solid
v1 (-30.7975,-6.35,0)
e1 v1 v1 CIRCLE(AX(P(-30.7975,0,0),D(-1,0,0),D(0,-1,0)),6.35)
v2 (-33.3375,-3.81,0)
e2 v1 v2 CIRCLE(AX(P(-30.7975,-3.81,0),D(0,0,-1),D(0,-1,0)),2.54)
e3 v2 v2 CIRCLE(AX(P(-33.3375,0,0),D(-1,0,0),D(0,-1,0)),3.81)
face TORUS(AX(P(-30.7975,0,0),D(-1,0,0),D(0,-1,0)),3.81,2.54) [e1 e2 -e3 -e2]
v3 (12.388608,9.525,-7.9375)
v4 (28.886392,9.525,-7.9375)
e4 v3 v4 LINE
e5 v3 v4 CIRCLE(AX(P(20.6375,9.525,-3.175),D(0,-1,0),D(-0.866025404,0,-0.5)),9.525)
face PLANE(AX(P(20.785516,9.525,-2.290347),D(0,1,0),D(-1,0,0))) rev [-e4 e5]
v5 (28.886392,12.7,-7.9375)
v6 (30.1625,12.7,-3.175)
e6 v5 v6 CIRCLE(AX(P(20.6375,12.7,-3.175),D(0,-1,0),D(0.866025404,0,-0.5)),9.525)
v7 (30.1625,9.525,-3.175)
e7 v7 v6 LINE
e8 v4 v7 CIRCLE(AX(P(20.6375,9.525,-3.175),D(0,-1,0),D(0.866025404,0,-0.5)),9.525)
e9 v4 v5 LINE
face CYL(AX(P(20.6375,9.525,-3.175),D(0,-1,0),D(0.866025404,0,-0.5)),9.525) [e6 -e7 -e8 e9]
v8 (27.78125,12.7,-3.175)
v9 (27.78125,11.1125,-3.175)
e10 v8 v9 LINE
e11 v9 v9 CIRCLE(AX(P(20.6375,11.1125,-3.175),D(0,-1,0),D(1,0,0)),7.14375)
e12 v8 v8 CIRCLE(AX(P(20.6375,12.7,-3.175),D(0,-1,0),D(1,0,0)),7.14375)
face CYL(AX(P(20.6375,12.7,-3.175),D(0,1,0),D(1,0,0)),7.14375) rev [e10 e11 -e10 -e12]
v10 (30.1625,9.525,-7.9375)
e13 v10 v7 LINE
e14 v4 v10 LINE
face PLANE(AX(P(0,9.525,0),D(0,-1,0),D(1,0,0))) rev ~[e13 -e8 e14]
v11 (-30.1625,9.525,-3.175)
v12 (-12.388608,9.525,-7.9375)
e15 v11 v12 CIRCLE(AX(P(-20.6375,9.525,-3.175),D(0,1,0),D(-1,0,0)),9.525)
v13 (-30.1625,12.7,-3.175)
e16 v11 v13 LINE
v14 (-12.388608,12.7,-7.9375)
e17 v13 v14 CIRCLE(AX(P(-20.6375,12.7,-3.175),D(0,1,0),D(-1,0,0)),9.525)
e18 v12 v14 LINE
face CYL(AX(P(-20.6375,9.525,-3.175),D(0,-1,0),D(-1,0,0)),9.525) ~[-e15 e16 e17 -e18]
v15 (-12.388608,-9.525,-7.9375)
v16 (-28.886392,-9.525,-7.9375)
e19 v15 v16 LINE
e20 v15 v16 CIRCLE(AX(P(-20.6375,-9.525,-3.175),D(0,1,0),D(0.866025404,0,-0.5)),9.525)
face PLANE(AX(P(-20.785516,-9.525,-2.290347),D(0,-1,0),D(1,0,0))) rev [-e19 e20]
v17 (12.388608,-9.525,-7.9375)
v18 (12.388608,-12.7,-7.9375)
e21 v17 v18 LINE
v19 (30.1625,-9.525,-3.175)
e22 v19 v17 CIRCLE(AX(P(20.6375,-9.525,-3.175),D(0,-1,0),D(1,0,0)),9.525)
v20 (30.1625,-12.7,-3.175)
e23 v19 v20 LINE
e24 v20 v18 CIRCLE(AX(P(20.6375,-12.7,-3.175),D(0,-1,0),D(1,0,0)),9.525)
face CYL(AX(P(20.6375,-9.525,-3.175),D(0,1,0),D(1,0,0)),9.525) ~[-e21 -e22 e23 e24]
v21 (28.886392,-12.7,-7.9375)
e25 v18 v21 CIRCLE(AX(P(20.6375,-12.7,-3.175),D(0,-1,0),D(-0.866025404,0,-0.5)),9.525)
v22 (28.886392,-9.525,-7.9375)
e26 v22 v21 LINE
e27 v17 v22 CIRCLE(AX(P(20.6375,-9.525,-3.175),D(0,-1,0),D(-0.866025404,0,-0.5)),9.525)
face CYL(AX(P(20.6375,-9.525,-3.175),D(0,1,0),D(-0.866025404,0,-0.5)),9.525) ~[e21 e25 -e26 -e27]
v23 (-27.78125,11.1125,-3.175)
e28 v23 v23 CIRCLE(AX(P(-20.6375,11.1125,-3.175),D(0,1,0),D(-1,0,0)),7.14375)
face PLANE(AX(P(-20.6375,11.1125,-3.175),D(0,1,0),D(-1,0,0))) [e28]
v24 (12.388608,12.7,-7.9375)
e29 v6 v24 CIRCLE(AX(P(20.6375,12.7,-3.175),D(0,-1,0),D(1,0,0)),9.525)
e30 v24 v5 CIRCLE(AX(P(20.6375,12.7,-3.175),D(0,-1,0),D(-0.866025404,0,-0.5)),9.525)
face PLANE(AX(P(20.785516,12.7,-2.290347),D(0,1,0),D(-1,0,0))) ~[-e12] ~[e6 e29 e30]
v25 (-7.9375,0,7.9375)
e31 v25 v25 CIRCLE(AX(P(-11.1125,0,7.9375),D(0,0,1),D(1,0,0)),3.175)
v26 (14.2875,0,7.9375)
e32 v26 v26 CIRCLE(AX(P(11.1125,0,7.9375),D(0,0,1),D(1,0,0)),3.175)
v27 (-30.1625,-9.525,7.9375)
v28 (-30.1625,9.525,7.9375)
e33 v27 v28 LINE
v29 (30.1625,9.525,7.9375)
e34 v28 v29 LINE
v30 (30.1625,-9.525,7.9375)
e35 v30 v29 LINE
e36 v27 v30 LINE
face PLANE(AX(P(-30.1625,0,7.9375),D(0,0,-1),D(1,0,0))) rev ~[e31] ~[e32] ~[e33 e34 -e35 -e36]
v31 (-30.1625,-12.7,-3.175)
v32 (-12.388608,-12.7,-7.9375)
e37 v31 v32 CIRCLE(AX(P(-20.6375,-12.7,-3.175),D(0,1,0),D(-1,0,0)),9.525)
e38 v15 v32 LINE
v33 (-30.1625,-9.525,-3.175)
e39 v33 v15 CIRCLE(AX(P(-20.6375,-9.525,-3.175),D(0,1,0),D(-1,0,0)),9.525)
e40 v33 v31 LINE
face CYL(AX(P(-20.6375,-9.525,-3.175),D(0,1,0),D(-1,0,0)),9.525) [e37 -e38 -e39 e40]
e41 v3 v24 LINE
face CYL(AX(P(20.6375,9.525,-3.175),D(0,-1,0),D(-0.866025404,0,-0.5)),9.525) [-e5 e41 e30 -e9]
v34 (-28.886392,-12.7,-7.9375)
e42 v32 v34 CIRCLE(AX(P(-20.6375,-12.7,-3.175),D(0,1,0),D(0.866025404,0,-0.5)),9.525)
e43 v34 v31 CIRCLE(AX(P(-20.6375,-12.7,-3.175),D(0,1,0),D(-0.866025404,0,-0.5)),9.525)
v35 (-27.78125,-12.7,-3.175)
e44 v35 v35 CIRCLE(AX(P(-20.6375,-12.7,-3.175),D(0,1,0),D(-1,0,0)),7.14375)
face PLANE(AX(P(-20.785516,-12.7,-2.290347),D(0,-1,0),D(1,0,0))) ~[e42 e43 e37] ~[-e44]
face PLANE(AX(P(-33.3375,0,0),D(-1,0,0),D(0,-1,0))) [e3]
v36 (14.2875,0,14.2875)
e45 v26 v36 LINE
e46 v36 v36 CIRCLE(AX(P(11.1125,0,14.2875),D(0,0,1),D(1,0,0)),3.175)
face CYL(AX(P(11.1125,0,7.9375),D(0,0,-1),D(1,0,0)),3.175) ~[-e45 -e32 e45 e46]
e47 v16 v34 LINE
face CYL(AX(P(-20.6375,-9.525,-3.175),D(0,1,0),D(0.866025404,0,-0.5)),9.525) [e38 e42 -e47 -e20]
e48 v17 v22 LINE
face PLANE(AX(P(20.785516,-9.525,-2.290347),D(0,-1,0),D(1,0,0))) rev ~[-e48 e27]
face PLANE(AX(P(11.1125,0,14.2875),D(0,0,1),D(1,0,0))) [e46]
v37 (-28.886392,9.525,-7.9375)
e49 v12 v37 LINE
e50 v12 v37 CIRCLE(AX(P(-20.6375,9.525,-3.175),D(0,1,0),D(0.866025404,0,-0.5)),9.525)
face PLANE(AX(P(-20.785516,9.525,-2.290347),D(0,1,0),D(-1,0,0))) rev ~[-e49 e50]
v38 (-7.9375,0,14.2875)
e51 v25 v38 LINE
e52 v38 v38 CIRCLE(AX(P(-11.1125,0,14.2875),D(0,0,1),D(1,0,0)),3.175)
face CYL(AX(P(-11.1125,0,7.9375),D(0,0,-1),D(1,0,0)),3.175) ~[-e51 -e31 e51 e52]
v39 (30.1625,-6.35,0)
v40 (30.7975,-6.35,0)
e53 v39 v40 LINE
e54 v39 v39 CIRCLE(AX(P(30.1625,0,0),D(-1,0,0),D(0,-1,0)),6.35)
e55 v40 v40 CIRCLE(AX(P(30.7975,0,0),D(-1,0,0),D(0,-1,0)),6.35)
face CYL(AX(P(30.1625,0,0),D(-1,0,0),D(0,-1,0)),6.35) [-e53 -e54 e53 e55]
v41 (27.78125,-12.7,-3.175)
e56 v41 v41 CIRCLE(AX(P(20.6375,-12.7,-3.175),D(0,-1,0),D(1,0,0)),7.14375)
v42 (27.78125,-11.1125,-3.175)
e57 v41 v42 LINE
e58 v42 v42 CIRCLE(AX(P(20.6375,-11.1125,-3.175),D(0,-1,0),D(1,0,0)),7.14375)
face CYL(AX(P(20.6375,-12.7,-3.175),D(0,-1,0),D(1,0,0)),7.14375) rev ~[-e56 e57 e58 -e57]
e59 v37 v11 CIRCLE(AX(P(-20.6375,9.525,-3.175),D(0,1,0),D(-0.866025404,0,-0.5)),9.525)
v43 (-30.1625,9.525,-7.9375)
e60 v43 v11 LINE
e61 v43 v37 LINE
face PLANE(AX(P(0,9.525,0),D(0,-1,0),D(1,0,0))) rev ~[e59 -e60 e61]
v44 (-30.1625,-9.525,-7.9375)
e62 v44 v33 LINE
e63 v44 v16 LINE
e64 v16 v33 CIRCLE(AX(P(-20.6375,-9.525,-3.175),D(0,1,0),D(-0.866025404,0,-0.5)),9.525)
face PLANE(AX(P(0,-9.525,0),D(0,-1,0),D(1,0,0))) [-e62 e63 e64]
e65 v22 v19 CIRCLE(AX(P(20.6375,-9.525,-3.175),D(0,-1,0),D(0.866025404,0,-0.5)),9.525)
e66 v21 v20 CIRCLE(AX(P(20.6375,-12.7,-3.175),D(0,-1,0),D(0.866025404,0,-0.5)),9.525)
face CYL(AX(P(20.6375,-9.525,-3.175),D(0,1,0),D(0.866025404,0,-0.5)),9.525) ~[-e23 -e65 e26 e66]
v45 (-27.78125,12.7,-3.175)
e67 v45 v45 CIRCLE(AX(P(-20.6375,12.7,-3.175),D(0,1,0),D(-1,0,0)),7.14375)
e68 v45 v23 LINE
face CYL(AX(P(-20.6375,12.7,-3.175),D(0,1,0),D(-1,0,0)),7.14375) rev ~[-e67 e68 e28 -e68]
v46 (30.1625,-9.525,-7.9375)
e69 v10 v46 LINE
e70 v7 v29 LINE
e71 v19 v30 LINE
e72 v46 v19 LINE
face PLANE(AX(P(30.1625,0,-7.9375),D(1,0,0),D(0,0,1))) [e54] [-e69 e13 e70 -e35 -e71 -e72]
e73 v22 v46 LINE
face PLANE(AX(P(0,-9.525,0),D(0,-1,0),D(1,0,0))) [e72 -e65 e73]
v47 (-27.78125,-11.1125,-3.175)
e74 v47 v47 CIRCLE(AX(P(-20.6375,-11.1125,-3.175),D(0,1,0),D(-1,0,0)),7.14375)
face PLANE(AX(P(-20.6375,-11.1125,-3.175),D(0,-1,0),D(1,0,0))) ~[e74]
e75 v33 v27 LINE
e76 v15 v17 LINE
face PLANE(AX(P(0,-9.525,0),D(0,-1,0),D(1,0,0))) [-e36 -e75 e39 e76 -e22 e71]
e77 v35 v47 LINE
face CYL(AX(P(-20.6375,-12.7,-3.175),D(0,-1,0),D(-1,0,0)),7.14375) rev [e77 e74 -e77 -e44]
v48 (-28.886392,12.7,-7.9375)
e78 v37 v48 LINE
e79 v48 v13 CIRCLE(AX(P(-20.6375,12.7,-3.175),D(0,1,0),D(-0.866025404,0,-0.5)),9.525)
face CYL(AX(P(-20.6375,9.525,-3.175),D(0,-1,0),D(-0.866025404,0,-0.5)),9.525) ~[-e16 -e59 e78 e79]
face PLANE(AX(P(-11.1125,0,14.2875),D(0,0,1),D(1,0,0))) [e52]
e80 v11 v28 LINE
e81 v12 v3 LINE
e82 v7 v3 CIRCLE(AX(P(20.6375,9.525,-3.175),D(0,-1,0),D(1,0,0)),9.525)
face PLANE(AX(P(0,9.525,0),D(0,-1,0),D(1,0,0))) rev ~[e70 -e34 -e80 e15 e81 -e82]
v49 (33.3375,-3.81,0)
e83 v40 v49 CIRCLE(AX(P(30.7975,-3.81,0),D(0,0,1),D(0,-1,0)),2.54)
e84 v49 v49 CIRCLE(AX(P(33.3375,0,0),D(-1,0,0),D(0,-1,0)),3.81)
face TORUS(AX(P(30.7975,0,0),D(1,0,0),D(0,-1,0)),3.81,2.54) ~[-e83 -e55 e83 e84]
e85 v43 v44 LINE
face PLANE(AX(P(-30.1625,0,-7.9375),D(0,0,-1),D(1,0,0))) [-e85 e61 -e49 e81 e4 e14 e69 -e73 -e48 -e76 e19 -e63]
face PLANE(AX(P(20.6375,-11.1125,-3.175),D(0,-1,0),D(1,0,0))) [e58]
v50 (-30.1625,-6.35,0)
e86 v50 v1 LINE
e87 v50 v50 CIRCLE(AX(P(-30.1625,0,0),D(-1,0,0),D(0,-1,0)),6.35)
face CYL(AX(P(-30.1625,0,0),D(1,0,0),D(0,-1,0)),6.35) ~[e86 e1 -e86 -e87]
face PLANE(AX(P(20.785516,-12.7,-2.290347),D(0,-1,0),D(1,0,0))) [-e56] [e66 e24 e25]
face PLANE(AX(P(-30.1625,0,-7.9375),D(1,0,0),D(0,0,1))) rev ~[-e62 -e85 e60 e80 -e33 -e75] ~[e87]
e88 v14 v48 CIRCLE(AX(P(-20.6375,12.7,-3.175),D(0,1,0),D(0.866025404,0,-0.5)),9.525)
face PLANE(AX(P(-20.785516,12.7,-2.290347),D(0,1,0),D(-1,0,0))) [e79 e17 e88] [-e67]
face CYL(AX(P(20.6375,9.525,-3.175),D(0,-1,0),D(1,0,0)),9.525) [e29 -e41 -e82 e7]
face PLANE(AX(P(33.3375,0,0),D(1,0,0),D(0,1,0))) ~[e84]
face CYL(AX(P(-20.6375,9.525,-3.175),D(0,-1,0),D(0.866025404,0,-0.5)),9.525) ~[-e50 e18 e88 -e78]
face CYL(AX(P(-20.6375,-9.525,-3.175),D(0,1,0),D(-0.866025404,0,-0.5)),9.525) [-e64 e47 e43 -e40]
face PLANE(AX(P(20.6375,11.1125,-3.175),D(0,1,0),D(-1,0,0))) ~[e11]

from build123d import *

# Parameters (mm, degrees)
F0_W      = 60.325
F0_H      = 15.875
F1_DEPTH  = 9.525
F3_DEPTH  = 3.175
F5_R      = 7.14375
F6_DEPTH  = 1.5875
F9_R      = 6.35
F10_DEPTH = 3.175
F11_R     = 2.54
F13_R     = 3.175
F14_DEPTH = 6.35


# Not quite as in the source:
# - a length typed as a fraction of an inch, garbled in the dataset ("3 / 203.2 mm" for 3/8 in), is restored
# - a feature names something its author has since deleted; it is built from what else it names
# - the program builds the solid bodies; features that only make, move or delete a surface that nothing else refers to are left out


with BuildPart() as f1:
    # F0 (on Front) → F1 (new body, symmetric)
    with BuildSketch(Plane.XZ):
        Rectangle(F0_W, F0_H)
    extrude(amount=F1_DEPTH, both=True)

    # F2 (on face) → F3 (join)
    with BuildSketch(Plane.XZ.offset(9.525)):
        with BuildLine():
            ThreePointArc((28.886391971, -7.9375), (29.8379434954, -5.6402514046), (30.1625, -3.175))
            ThreePointArc((30.1625, -3.175), (18.1722485954, 6.0254434954), (12.388608029, -7.9375))
            Line((12.388608029, -7.9375), (20.6375, -7.9375))
            Line((20.6375, -7.9375), (28.886391971, -7.9375))
        make_face()
        with BuildLine():
            Line((20.6375, -3.175), (20.6375, -7.9375))
            ThreePointArc((20.6375, -7.9375), (15.875, -3.175), (20.6375, 1.5875))
            Line((20.6375, 1.5875), (20.6375, -3.175))
        make_face(mode=Mode.SUBTRACT)
        with BuildLine():
            ThreePointArc((20.6375, 1.5875), (15.875, -3.175), (20.6375, -7.9375))
            Line((20.6375, -7.9375), (20.6375, -3.175))
            Line((20.6375, -3.175), (20.6375, 1.5875))
        make_face()
        with BuildLine():
            Line((20.6375, -7.9375), (12.388608029, -7.9375))
            ThreePointArc((12.388608029, -7.9375), (20.6375, -12.7), (28.886391971, -7.9375))
            Line((28.886391971, -7.9375), (20.6375, -7.9375))
        make_face()
    extrude(amount=F3_DEPTH)

    # F5 (on face) → F6 (cut)
    with BuildSketch(Plane.XZ.offset(12.7)):
        with Locations((20.6375, -3.175)):
            Circle(F5_R)
    extrude(amount=-F6_DEPTH, mode=Mode.SUBTRACT)


with BuildPart() as f7_1:
    # F7: instance of F1
    add(f1.part.mirror(Plane.YZ))


with BuildPart() as f8_1:
    # F8: instance of F1
    add(f1.part.mirror(Plane.XZ))


with BuildPart() as f8_2:
    # F8: instance of F7_1
    add(f7_1.part.mirror(Plane.XZ))


with BuildPart() as f1_1:
    add(f1.part)

    add(f7_1.part)  # F10 merges F7_1

    add(f8_1.part)  # F10 merges F8_1

    add(f8_2.part)  # F10 merges F8_2
    # F9 (on face) → F10 (join)
    with BuildSketch(Plane(origin=(-30.1625, 0, 0), x_dir=(0, -1, 0), z_dir=(-1, 0, 0))):
        Circle(F9_R)
    extrude(amount=F10_DEPTH)

    # F11
    f11_edges = [f1_1.edges().sort_by_distance(p)[0] for p in [
        (-33.3375, 6.35, 0),
    ]]
    fillet(f11_edges, radius=F11_R)


with BuildPart() as f12_1:
    # F12: instance of F1
    add(f1_1.part.mirror(Plane.YZ))


with BuildPart() as f1_2:
    add(f1_1.part)

    add(f12_1.part)  # F14 merges F12_1
    # F13 (on face) → F14 (join)
    with BuildSketch(Plane.XY.offset(7.9375)):
        with Locations((-11.1125, 0)):
            Circle(F13_R)
        with Locations((11.1125, 0)):
            Circle(F13_R)
    extrude(amount=F14_DEPTH)


solid = f1_2.part
